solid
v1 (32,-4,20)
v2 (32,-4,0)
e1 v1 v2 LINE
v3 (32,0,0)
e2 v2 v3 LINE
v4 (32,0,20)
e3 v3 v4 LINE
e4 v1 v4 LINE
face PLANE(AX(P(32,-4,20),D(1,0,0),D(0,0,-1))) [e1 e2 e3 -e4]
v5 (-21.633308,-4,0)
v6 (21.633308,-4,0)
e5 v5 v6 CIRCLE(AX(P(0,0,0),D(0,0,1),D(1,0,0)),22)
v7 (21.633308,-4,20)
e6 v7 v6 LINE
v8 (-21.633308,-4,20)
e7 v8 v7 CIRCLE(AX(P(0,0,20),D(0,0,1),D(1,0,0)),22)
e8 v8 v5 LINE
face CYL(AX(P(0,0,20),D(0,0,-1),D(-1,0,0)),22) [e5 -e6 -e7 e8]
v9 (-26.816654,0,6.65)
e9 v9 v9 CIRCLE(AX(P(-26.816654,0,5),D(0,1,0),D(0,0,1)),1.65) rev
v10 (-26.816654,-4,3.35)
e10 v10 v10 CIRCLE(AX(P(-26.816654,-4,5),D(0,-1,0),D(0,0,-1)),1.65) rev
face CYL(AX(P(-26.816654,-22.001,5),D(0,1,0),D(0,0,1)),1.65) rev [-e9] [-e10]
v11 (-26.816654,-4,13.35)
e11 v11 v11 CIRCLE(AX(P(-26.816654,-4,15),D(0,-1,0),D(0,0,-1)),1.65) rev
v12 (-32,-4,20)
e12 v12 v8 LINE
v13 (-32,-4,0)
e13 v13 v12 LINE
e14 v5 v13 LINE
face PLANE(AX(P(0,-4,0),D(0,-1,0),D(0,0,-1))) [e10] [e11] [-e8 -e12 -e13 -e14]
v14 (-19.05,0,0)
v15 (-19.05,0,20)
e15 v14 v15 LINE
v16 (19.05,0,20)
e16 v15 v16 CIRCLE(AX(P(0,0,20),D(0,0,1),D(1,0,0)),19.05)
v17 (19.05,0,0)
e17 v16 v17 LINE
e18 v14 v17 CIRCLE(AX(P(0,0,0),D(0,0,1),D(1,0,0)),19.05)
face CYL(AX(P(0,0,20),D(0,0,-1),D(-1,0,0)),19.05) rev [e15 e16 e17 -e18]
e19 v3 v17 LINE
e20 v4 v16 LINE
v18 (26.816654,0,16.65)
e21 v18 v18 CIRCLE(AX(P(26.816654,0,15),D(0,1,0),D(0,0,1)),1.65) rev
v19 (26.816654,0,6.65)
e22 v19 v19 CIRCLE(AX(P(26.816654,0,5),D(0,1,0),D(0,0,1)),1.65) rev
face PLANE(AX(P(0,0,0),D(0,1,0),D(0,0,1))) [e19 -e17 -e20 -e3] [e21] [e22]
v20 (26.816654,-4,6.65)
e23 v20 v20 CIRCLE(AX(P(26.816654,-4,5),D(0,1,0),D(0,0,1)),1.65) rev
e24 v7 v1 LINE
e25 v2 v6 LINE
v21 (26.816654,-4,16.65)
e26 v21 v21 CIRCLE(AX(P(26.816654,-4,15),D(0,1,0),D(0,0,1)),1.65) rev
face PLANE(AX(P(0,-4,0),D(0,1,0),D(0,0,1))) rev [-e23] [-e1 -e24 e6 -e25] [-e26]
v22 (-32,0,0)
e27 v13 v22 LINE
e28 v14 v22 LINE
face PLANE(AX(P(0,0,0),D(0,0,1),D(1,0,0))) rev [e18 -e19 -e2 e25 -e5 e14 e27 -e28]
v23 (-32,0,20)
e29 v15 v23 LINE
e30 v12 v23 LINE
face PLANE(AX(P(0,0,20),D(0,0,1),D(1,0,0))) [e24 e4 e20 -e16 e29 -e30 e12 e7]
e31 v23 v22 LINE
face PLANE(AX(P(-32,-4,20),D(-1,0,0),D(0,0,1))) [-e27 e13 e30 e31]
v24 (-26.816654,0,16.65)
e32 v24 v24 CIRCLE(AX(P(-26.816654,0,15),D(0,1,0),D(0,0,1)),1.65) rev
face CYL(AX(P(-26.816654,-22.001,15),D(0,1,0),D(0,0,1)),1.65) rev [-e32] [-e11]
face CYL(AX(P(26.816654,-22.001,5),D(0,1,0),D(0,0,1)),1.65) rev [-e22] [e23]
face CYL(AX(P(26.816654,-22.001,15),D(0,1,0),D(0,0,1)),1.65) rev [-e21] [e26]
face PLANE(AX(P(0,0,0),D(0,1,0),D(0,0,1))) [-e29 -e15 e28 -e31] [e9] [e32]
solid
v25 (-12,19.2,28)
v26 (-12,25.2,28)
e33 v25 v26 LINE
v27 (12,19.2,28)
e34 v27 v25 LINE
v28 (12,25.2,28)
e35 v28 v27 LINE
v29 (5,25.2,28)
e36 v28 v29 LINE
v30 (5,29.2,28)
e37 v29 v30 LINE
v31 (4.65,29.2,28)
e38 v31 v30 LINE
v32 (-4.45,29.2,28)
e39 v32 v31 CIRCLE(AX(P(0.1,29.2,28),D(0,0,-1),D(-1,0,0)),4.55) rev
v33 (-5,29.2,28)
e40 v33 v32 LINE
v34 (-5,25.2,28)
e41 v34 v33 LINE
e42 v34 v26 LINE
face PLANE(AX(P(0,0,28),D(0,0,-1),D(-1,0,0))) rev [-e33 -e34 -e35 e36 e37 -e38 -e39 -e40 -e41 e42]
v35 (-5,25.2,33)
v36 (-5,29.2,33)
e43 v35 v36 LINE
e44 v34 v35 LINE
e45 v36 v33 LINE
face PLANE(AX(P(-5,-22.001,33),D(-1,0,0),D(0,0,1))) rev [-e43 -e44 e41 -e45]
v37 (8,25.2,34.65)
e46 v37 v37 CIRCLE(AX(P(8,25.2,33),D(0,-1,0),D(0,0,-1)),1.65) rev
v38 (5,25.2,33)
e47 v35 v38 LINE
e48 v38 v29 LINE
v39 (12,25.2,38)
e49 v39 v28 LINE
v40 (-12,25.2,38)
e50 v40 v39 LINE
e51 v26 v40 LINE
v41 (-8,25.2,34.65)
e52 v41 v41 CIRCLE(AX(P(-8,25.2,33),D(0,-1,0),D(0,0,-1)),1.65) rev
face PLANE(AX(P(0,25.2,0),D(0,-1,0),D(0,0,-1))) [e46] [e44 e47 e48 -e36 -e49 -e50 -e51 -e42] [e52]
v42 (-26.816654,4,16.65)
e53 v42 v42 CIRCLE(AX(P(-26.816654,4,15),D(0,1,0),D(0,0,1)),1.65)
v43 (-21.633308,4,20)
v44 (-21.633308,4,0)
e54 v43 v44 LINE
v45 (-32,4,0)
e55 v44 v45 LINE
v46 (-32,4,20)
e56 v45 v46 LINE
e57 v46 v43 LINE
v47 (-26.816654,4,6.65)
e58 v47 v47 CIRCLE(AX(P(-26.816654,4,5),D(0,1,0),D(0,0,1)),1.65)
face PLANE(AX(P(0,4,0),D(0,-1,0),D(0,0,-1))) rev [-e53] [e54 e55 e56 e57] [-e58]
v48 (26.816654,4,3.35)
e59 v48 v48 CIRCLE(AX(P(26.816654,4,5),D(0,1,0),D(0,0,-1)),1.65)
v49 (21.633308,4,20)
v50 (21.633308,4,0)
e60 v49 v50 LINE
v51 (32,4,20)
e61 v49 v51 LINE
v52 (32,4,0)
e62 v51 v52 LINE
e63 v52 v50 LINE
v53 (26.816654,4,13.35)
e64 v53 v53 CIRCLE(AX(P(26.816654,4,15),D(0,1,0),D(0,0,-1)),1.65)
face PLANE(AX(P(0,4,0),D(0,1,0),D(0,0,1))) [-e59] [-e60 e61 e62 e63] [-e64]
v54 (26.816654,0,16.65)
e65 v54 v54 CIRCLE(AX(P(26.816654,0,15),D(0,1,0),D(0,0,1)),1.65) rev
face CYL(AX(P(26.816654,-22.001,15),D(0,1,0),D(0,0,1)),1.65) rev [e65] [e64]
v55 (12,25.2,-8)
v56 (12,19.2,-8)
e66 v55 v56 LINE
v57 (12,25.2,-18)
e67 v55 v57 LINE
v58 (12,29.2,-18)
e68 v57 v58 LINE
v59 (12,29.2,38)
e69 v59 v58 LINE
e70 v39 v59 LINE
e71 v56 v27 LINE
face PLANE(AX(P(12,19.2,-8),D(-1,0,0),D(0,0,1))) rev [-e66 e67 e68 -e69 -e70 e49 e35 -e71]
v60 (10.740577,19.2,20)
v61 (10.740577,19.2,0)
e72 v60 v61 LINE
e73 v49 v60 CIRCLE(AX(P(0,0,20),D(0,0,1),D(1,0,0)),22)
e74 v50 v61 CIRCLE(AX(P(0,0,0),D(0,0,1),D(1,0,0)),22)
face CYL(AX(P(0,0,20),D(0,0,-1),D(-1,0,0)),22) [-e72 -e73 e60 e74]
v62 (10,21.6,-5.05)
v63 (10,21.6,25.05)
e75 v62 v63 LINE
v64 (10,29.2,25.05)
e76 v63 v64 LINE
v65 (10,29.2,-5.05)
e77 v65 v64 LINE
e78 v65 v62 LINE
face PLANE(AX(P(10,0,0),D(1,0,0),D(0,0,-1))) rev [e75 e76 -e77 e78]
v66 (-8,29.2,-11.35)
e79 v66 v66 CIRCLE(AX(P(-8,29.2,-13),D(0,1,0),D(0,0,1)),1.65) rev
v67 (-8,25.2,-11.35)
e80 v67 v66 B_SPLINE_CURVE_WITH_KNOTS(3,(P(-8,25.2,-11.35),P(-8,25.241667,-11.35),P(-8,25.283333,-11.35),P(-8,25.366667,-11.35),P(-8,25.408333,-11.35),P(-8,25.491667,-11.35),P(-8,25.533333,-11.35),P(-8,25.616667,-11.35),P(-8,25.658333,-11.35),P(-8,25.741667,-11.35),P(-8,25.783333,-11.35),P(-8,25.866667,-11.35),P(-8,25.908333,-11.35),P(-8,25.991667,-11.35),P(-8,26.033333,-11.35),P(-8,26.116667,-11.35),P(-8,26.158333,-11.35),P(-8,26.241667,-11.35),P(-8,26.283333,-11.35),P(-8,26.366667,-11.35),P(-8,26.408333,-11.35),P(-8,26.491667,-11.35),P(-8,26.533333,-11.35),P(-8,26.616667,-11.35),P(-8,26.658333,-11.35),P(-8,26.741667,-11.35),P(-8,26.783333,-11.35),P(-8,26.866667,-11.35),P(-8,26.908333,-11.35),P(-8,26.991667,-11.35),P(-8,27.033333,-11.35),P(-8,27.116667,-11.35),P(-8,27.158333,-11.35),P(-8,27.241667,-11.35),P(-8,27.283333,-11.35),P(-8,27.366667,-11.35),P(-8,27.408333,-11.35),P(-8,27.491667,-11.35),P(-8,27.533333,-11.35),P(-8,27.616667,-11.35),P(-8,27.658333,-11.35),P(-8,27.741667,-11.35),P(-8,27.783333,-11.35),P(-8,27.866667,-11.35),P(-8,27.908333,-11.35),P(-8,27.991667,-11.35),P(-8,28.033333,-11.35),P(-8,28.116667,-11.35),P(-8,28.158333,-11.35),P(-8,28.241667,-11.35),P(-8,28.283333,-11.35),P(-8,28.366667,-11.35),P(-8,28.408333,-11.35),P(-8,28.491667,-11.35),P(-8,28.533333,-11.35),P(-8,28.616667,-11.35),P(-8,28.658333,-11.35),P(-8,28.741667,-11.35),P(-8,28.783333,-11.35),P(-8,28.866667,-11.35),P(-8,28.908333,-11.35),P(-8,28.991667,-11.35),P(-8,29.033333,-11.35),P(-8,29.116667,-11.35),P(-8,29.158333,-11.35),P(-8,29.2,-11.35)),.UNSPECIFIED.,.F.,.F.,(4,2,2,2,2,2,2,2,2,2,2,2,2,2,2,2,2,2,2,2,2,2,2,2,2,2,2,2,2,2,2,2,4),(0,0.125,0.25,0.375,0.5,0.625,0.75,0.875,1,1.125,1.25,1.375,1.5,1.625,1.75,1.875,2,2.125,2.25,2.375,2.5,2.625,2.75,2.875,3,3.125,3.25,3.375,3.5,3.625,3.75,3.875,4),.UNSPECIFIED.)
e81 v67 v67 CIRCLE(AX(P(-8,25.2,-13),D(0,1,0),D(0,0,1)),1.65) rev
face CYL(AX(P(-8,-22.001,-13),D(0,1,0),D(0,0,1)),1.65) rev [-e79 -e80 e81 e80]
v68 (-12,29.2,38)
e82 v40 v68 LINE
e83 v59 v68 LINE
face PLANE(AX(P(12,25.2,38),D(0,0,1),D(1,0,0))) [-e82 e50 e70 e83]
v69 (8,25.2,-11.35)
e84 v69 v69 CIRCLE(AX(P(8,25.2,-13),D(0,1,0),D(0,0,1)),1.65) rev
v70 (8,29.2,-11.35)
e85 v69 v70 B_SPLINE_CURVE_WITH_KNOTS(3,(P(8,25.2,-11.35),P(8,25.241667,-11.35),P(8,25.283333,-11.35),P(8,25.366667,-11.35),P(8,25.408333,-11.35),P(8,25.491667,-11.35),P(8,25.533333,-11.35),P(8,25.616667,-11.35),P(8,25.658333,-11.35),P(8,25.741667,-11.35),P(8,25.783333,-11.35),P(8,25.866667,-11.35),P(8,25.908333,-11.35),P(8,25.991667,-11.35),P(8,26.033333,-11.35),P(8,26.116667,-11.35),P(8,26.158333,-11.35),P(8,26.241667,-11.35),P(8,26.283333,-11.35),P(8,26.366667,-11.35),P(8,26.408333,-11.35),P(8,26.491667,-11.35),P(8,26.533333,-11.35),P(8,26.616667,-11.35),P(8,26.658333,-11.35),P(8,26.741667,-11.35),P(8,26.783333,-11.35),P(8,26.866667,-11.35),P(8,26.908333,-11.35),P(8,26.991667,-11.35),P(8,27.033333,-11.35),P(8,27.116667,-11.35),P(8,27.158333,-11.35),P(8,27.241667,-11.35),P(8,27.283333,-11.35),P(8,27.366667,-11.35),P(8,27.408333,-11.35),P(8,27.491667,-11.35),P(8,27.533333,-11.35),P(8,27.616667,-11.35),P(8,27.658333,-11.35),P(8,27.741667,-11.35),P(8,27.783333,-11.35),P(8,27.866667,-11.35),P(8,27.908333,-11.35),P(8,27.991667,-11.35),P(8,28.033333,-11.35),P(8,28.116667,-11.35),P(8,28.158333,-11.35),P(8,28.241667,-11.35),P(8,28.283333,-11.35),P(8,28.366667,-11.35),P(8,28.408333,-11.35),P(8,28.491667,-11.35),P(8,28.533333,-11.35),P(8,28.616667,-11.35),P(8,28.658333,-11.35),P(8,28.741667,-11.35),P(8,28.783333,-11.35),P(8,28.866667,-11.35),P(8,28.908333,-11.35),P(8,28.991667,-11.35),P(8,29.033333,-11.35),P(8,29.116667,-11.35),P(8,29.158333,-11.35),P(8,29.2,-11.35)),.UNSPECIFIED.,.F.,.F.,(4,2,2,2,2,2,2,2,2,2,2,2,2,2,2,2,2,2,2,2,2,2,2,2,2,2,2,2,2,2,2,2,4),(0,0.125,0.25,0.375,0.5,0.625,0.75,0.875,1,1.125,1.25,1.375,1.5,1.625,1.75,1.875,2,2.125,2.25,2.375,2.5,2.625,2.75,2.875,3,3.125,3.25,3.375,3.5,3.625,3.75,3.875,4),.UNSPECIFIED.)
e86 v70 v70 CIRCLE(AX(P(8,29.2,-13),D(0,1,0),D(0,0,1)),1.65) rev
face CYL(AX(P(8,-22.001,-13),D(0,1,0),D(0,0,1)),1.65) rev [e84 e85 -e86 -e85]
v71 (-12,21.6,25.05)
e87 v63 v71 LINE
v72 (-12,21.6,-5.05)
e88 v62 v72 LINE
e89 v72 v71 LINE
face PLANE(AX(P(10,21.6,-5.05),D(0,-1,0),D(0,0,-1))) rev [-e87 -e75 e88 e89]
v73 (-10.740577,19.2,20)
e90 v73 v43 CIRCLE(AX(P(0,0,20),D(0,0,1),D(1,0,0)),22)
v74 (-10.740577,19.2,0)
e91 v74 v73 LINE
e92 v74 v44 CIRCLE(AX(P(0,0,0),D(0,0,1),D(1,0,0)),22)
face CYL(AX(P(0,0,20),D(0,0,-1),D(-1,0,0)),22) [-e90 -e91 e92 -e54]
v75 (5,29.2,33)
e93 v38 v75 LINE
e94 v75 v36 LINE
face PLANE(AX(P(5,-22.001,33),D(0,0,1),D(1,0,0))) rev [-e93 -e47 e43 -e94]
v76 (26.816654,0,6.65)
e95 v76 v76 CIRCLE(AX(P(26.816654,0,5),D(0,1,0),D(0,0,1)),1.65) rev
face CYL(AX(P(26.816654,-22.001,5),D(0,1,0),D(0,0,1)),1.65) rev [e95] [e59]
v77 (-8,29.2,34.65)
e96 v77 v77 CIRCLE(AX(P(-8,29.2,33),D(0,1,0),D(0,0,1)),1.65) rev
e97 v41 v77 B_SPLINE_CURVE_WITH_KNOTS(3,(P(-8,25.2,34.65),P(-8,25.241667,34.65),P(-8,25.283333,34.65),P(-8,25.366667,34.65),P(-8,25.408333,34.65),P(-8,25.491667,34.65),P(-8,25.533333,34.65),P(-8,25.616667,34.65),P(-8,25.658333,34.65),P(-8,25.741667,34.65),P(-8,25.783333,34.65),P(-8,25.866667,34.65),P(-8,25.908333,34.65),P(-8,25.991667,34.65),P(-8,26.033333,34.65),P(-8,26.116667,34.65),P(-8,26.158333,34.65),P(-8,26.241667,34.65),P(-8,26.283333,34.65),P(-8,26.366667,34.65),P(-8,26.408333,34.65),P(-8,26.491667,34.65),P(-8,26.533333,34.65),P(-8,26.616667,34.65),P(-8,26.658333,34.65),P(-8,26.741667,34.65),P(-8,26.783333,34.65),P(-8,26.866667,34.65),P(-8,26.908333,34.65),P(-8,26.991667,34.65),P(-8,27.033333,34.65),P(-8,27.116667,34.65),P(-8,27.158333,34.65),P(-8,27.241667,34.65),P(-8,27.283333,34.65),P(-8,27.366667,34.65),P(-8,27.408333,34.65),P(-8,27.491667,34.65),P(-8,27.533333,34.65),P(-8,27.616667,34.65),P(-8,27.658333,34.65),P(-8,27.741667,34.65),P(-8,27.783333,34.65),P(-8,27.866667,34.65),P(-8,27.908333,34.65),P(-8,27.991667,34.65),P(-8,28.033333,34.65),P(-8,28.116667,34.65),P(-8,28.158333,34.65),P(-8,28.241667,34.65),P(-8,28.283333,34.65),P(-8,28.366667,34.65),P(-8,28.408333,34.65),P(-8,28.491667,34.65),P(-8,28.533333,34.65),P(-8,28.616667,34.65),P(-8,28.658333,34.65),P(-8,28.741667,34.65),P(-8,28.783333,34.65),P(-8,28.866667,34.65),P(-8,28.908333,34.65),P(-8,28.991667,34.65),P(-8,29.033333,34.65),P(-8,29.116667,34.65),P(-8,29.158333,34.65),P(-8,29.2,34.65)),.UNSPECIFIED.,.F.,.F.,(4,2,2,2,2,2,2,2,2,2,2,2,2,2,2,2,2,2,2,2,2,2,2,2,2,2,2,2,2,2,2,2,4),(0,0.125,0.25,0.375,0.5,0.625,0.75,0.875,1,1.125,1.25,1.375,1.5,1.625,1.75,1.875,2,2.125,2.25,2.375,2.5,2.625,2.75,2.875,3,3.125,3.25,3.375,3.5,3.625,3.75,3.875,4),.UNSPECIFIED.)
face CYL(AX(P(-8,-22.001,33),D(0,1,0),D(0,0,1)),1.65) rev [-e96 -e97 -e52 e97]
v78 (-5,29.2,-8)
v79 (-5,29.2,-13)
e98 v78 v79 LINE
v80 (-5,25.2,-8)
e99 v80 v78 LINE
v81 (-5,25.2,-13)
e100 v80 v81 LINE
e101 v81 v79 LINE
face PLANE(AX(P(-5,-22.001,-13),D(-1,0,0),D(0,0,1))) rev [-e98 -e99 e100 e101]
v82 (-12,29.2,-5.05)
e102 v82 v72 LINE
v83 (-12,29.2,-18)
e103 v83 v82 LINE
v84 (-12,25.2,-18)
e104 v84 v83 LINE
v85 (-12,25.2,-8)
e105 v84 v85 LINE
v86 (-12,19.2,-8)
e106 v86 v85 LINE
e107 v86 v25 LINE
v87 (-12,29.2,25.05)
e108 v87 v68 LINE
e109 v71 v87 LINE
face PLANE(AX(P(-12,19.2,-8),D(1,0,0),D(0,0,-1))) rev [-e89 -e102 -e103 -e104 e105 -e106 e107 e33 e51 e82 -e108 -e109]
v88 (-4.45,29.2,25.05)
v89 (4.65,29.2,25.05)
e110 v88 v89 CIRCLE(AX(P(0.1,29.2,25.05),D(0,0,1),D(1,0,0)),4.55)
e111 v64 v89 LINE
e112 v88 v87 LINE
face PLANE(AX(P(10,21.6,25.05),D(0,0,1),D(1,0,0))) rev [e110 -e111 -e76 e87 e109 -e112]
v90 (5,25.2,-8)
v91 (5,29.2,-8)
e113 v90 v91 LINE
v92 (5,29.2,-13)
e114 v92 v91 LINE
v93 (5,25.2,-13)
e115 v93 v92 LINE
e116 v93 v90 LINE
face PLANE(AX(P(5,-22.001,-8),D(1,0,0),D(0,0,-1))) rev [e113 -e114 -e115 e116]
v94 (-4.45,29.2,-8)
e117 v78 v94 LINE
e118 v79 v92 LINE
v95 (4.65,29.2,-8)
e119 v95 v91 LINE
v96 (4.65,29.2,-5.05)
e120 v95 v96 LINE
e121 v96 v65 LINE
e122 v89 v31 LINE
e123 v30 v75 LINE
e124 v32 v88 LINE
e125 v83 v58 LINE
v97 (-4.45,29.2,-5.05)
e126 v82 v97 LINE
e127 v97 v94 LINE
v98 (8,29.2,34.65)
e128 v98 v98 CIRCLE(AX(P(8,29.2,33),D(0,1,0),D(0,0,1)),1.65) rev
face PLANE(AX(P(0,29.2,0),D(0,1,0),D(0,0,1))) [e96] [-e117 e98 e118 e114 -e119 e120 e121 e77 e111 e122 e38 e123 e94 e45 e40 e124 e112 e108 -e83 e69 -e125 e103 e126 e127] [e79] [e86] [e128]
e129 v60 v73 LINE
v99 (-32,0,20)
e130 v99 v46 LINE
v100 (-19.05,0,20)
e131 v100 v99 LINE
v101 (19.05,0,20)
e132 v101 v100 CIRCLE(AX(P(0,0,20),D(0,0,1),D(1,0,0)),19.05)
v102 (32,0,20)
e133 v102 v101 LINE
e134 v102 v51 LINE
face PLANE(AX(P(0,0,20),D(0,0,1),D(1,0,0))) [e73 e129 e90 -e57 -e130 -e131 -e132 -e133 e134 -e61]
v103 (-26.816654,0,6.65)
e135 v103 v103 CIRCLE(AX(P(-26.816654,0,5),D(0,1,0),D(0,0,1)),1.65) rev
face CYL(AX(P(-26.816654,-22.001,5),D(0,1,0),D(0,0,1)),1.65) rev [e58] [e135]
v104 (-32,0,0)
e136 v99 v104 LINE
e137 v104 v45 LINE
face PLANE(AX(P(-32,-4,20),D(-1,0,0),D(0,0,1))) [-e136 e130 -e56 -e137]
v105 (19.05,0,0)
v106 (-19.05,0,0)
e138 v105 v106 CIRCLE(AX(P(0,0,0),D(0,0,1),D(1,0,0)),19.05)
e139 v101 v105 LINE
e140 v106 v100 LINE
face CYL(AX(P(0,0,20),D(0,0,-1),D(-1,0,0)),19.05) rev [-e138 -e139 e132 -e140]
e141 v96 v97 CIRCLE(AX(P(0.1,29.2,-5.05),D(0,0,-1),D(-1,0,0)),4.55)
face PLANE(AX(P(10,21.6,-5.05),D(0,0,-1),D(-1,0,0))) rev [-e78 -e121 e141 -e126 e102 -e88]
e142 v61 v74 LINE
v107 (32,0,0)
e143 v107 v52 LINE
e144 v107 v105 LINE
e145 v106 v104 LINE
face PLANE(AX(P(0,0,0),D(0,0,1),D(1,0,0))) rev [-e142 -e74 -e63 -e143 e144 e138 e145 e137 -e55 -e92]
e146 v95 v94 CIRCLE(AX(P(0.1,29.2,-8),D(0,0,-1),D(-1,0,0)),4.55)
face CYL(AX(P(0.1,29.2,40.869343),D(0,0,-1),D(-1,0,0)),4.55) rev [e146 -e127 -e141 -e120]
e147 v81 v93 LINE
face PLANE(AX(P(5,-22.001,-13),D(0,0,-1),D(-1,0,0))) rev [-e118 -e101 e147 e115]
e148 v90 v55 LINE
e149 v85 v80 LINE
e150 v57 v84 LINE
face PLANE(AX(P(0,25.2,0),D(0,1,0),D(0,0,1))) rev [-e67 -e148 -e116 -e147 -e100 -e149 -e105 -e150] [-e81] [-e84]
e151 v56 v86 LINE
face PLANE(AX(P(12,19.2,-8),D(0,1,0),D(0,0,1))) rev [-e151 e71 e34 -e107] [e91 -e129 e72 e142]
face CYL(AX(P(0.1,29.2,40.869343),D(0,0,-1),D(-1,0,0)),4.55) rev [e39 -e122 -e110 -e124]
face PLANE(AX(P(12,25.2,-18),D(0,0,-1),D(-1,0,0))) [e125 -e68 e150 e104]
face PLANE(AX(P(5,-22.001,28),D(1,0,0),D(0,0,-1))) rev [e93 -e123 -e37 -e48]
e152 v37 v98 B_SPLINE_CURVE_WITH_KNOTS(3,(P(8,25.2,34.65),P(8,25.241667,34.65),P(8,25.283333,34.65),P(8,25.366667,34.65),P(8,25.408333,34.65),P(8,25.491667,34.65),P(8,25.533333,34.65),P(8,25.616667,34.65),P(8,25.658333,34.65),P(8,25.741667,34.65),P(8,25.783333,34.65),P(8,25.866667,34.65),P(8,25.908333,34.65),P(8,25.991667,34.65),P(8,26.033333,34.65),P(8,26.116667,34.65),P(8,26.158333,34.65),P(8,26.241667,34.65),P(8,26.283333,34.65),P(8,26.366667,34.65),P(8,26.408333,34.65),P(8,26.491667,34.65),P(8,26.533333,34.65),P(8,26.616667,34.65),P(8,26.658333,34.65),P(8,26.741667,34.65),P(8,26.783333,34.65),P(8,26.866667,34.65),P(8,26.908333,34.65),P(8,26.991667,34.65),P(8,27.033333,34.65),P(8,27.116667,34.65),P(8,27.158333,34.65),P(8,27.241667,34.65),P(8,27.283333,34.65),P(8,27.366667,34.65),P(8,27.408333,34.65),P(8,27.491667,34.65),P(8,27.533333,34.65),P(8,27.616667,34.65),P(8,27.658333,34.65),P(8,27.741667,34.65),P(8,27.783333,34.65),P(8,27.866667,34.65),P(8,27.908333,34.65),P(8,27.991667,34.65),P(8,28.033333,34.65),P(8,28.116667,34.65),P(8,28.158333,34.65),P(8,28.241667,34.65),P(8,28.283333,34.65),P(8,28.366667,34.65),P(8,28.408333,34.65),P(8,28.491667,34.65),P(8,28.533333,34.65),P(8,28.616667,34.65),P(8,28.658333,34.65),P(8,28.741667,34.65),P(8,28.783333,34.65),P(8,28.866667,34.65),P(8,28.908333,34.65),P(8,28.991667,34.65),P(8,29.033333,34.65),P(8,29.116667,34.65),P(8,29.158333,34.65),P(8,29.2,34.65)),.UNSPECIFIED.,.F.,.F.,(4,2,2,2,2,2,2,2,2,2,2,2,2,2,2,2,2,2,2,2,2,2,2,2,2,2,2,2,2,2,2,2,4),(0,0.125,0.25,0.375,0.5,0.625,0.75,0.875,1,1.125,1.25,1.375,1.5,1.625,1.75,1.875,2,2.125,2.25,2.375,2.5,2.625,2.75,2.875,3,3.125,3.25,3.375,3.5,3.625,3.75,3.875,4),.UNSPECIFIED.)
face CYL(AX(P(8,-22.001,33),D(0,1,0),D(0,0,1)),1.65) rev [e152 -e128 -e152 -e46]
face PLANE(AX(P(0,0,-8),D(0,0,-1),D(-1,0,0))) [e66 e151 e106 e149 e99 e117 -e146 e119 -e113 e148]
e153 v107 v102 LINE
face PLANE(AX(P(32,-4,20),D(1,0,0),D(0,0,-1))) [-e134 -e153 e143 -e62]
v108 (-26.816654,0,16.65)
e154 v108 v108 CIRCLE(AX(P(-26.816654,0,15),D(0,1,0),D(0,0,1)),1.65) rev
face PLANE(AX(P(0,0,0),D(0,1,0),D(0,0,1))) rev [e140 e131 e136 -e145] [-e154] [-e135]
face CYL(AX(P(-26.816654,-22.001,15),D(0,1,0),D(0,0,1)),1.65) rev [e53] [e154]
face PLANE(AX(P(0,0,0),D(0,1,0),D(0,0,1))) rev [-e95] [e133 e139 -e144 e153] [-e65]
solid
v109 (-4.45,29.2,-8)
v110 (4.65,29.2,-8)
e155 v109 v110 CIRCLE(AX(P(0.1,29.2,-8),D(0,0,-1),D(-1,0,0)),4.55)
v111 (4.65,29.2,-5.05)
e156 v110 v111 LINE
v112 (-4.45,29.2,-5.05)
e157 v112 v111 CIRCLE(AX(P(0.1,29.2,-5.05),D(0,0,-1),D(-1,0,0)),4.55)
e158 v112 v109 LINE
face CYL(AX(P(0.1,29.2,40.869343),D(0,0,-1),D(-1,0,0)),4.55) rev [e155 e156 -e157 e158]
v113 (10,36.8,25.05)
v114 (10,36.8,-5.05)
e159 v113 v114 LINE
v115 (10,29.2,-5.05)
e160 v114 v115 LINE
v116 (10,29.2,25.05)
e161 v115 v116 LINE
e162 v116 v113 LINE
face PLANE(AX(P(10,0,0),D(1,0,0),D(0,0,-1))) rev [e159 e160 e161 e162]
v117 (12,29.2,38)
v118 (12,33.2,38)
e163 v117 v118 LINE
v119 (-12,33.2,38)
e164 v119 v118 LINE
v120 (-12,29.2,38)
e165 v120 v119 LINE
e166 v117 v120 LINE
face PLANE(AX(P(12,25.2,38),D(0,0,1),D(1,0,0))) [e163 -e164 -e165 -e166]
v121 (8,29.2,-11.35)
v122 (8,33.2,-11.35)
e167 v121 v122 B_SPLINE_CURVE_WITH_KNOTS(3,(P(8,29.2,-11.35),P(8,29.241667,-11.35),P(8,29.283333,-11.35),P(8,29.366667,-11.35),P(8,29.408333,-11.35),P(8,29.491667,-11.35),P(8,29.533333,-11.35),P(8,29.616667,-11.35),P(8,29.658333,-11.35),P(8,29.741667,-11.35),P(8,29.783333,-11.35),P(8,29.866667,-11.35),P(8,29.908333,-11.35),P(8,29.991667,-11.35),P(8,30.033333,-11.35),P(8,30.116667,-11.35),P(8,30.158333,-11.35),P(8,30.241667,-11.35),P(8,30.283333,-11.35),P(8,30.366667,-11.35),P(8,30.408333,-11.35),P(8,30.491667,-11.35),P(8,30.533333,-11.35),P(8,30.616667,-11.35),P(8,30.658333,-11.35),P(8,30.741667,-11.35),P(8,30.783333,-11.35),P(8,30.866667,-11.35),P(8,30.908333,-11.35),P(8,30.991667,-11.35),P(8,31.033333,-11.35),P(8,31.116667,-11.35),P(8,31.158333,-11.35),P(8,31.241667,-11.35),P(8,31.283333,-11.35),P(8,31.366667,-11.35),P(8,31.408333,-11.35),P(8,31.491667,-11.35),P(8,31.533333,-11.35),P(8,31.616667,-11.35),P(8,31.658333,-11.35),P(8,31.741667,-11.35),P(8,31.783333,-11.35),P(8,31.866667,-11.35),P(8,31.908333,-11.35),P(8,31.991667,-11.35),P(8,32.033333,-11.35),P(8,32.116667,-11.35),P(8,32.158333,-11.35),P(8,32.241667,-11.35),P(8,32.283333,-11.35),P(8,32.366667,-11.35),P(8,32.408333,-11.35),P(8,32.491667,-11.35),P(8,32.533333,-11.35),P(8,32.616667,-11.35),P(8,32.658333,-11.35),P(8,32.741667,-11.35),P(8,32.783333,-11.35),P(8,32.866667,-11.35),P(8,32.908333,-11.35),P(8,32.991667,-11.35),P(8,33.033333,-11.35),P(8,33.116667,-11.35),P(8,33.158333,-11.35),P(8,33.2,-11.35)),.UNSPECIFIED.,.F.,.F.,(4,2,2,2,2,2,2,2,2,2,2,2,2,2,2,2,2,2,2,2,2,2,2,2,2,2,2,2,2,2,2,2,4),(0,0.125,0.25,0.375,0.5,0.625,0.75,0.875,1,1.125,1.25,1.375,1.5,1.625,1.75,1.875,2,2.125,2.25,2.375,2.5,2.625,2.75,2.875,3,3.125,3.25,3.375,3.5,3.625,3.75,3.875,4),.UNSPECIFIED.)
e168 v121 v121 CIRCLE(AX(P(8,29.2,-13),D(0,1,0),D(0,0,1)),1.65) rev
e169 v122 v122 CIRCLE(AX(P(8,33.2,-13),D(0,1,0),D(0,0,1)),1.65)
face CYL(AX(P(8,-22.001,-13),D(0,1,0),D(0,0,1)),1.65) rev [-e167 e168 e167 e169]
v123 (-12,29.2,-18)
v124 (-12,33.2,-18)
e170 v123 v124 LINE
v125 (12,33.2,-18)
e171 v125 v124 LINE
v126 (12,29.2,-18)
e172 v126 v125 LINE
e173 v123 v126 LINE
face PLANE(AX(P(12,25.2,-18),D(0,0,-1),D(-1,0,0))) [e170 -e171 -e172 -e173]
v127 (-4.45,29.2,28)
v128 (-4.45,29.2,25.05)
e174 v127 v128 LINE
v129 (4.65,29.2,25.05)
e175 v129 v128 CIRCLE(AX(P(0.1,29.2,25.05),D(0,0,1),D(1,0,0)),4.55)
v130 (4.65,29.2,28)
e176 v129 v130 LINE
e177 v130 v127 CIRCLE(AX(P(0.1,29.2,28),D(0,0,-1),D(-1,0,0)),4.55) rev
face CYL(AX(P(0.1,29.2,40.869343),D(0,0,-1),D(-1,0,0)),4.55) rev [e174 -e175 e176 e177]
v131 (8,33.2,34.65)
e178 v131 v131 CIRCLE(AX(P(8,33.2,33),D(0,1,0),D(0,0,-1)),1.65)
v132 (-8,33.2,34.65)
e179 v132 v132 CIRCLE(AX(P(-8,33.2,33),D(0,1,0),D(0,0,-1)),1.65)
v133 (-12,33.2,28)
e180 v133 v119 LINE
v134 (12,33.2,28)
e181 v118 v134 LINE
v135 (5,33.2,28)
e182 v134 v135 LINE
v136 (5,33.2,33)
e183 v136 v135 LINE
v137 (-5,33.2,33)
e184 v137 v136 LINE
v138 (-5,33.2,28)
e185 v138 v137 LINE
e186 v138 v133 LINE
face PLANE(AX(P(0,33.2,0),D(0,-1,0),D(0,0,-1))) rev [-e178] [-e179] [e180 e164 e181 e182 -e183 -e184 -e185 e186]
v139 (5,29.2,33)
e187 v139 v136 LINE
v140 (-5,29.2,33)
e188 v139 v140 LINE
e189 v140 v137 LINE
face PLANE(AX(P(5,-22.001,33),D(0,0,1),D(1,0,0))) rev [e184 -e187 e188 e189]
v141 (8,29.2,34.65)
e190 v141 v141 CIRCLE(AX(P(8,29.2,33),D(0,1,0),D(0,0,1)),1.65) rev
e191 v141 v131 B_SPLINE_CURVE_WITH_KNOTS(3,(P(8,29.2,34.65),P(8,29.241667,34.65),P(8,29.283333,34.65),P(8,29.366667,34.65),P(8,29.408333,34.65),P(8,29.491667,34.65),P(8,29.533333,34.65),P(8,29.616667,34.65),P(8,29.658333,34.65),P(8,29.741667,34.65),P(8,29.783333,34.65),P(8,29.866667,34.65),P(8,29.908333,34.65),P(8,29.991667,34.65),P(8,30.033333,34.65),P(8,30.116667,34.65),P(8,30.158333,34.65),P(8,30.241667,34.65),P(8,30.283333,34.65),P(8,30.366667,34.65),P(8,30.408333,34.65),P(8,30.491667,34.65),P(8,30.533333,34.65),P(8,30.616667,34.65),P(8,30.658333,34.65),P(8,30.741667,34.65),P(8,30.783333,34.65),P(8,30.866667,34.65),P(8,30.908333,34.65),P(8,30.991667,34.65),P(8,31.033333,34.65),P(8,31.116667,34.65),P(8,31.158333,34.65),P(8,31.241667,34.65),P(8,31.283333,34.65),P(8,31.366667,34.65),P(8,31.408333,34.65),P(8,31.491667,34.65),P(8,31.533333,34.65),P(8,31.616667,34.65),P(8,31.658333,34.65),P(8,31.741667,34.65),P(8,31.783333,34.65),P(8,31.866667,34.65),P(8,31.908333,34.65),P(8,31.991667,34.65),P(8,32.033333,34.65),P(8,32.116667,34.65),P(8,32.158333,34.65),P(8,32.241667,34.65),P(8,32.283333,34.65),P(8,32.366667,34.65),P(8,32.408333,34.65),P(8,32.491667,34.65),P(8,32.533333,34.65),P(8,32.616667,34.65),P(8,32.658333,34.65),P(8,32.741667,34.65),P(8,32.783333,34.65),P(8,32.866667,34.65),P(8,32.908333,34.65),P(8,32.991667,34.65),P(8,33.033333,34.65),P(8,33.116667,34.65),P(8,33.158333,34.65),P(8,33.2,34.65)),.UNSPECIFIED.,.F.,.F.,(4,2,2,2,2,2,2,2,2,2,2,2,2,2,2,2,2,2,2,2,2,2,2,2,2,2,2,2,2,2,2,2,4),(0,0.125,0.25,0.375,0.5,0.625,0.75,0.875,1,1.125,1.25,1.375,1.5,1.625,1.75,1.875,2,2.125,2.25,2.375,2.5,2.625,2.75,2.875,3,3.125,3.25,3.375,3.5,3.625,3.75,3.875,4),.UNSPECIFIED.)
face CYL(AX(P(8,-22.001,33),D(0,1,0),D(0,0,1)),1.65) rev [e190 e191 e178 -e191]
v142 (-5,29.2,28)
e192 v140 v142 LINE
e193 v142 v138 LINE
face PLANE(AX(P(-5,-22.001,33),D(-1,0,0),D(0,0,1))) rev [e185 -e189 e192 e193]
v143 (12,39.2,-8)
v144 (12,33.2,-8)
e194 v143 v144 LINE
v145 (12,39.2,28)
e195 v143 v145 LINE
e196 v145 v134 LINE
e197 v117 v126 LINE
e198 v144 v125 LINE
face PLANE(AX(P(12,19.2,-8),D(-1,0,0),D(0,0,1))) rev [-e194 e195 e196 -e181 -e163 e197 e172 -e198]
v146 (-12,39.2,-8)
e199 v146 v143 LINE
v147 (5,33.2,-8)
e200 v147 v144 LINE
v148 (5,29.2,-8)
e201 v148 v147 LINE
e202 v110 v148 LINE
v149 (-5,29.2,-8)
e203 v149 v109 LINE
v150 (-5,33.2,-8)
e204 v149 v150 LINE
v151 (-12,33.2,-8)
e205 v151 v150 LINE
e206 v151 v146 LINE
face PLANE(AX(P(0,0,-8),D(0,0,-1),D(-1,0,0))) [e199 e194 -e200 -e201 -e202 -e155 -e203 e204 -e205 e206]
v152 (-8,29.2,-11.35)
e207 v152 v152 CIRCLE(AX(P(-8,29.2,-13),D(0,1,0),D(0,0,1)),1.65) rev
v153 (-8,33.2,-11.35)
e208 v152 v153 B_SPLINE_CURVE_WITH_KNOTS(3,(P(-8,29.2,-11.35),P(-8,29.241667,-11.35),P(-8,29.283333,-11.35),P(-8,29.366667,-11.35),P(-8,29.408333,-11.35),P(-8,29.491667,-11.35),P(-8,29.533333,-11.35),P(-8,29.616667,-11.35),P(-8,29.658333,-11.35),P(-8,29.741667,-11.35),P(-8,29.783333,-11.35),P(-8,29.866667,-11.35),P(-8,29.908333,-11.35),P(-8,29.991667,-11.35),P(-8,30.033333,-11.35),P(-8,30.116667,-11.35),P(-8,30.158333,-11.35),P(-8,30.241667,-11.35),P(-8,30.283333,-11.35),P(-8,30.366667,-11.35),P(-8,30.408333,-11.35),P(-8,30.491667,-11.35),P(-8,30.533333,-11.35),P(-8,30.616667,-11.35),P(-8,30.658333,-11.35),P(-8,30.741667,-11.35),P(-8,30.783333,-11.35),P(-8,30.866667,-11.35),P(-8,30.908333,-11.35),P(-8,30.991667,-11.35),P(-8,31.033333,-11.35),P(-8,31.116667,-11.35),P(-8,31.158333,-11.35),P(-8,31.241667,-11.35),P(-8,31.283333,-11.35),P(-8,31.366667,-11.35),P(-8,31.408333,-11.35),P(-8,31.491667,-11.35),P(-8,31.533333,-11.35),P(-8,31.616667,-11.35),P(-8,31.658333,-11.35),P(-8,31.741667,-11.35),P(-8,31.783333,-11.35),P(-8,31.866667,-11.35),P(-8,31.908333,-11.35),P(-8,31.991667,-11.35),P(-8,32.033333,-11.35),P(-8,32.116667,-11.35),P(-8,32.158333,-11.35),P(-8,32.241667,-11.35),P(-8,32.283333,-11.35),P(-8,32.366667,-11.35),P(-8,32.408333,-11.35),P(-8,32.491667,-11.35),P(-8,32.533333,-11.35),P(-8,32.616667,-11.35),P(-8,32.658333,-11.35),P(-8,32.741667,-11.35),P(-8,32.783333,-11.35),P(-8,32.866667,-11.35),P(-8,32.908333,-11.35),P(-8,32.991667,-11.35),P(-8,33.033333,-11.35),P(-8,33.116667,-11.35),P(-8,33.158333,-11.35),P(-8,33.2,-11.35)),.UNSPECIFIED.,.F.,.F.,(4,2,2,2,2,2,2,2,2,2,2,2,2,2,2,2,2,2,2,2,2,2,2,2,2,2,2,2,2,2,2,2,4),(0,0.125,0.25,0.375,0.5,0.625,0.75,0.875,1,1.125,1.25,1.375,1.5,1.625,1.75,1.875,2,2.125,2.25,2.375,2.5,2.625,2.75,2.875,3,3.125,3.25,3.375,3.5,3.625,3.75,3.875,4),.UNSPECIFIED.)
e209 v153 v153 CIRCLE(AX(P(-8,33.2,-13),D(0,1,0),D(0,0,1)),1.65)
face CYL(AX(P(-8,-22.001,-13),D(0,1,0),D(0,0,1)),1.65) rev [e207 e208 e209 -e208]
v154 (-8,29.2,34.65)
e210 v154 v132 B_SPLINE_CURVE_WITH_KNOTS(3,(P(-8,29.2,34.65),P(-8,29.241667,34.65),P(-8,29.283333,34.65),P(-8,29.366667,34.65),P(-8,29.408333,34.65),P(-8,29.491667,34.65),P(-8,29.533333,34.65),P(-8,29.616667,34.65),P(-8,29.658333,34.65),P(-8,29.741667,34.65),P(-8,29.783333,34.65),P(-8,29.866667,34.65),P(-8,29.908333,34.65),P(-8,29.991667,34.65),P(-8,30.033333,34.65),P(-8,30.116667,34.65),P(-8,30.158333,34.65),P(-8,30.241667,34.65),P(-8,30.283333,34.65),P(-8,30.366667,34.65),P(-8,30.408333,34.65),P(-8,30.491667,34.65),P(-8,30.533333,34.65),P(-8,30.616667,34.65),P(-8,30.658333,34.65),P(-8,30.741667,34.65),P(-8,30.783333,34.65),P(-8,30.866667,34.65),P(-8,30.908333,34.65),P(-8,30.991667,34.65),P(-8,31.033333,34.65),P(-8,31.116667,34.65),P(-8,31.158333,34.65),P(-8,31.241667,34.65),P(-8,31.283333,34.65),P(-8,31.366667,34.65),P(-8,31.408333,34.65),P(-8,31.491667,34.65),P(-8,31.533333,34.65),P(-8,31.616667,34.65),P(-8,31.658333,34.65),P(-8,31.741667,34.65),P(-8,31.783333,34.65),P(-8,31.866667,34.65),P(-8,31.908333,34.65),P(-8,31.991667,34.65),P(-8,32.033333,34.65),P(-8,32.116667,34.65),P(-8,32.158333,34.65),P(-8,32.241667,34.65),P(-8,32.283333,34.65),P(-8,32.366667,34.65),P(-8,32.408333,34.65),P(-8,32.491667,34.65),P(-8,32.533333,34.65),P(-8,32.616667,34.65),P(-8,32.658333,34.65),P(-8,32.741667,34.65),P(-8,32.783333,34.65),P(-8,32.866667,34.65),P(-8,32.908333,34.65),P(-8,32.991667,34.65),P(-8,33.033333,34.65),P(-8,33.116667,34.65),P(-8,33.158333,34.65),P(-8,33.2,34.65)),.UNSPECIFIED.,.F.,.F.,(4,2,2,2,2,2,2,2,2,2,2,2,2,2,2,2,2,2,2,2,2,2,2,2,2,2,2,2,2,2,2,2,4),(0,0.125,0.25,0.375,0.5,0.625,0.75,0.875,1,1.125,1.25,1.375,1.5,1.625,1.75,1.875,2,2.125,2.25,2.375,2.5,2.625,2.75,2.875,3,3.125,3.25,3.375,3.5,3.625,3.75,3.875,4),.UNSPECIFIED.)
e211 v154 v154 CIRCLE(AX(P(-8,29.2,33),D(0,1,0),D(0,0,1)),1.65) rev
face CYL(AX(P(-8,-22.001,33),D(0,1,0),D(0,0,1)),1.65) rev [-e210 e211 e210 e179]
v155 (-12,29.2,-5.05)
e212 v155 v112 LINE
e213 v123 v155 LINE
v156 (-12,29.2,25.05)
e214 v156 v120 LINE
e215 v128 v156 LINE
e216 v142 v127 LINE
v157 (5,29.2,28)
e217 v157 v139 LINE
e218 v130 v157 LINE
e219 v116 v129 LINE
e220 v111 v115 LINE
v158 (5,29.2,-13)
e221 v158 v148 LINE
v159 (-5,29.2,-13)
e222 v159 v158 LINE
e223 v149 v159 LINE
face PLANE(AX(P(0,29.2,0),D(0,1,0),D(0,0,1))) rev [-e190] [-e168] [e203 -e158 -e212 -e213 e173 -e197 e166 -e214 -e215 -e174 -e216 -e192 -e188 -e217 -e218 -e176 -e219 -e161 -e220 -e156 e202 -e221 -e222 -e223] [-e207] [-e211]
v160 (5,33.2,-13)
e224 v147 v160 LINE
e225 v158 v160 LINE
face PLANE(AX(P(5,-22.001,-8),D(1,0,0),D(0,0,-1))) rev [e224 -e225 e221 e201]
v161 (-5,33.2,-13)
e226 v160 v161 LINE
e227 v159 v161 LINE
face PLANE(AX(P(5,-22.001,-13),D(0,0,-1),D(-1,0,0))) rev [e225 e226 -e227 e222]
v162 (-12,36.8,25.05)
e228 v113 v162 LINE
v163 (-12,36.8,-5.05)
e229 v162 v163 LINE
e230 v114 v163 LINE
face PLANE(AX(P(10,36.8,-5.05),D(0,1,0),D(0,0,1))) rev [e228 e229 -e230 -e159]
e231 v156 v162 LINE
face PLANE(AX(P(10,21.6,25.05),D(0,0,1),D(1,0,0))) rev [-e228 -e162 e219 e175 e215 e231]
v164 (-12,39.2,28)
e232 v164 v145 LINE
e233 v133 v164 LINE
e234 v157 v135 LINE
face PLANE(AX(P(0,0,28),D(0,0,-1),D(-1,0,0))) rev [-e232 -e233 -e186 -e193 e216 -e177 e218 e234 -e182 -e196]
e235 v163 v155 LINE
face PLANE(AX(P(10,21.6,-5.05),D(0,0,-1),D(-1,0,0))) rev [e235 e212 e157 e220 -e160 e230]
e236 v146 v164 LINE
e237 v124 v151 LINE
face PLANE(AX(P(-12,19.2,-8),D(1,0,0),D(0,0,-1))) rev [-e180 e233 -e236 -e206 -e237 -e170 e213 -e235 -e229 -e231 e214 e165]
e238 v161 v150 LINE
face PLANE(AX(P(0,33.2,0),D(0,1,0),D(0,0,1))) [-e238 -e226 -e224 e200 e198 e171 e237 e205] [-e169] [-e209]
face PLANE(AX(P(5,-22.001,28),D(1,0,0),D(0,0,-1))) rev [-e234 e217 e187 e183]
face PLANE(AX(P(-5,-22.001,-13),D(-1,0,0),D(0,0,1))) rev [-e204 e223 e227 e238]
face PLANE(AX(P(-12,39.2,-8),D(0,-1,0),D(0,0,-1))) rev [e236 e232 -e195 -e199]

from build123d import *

# Parameters (mm, degrees)
SKETCH_1_R           = 22
SKETCH_1_R_2         = 19.05
EXTRUDE_1_DEPTH      = 20
EXTRUDE_2_DEPTH      = 4
EXTRUDE_2_DEPTH_BACK = 4
SKETCH_2_W           = 12
SKETCH_2_H           = 20
CUT_EXTRUDE_1_REACH  = 47.826
SKETCH_3_R           = 1.65
EXTRUDE_3_DEPTH      = 8
EXTRUDE_3_DEPTH_BACK = 28
SKETCH_4_W           = 24
SKETCH_4_H           = 20
SKETCH_5_W           = 30.1
SKETCH_5_H           = 15.2
CUT_EXTRUDE_2_DEPTH  = 22
CUT_EXTRUDE_3_REACH  = 64.102
SKETCH_6_R           = 4.55
EXTRUDE_4_DEPTH      = 4
EXTRUDE_4_DEPTH_BACK = 4
SKETCH_7_W           = 24
SKETCH_7_H           = 10
CUT_EXTRUDE_4_REACH  = 76.263
SKETCH_8_R           = 1.65
SKETCH_8_W           = 10
SKETCH_8_H           = 5


# Read off the part's stored shape, not the designer's step: 部品分割2
with BuildPart() as part:
    # ｽｹｯﾁ1 → ﾎﾞｽ - 押し出し1 (new body)
    with BuildSketch(Plane.XY):
        Circle(SKETCH_1_R)
        Circle(SKETCH_1_R_2, mode=Mode.SUBTRACT)
    extrude(amount=EXTRUDE_1_DEPTH)

    # ｽｹｯﾁ2 → ﾎﾞｽ - 押し出し2 (add, two sides: drawn at the far end of the back side and taken through both)
    with BuildSketch(Plane(origin=(0, 0, 0), x_dir=(1, 0, 0), z_dir=(0, 1, 0)).offset(-EXTRUDE_2_DEPTH_BACK)):
        with Locations((-26, -10)):
            Rectangle(SKETCH_2_W, SKETCH_2_H)
        with Locations((26, -10)):
            Rectangle(SKETCH_2_W, SKETCH_2_H)
    extrude(amount=EXTRUDE_2_DEPTH + EXTRUDE_2_DEPTH_BACK)

    # ｽｹｯﾁ3 → ｶｯﾄ - 押し出し1 (cut, up to next)
    with BuildSketch(Plane(origin=(0, 4, 0), x_dir=(1, 0, 0), z_dir=(0, 1, 0)), mode=Mode.PRIVATE) as cut_extrude_1_sk1:
        with Locations(Location((-26.816653826, -5, 0), (0, 0, 270))):
            Circle(SKETCH_3_R)
    cut_extrude_1_tool1 = extrude(cut_extrude_1_sk1.sketch, amount=-CUT_EXTRUDE_1_REACH, mode=Mode.PRIVATE) & part.part
    # ｽｹｯﾁ3 → ｶｯﾄ - 押し出し1 (cut, up to next)
    with BuildSketch(Plane(origin=(0, 4, 0), x_dir=(1, 0, 0), z_dir=(0, 1, 0)), mode=Mode.PRIVATE) as cut_extrude_1_sk2:
        with Locations(Location((-26.816653826, -15, 0), (0, 0, 270))):
            Circle(SKETCH_3_R)
    cut_extrude_1_tool2 = extrude(cut_extrude_1_sk2.sketch, amount=-CUT_EXTRUDE_1_REACH, mode=Mode.PRIVATE) & part.part
    # ｽｹｯﾁ3 → ｶｯﾄ - 押し出し1 (cut, up to next)
    with BuildSketch(Plane(origin=(0, 4, 0), x_dir=(1, 0, 0), z_dir=(0, 1, 0)), mode=Mode.PRIVATE) as cut_extrude_1_sk3:
        with Locations(Location((26.816653826, -15, 0), (0, 0, 270))):
            Circle(SKETCH_3_R)
    cut_extrude_1_tool3 = extrude(cut_extrude_1_sk3.sketch, amount=-CUT_EXTRUDE_1_REACH, mode=Mode.PRIVATE) & part.part
    # ｽｹｯﾁ3 → ｶｯﾄ - 押し出し1 (cut, up to next)
    with BuildSketch(Plane(origin=(0, 4, 0), x_dir=(1, 0, 0), z_dir=(0, 1, 0)), mode=Mode.PRIVATE) as cut_extrude_1_sk4:
        with Locations(Location((26.816653826, -5, 0), (0, 0, 270))):
            Circle(SKETCH_3_R)
    cut_extrude_1_tool4 = extrude(cut_extrude_1_sk4.sketch, amount=-CUT_EXTRUDE_1_REACH, mode=Mode.PRIVATE) & part.part
    add(cut_extrude_1_tool1.solids().sort_by_distance((-26.816654, 4, 5))[0], mode=Mode.SUBTRACT)
    add(cut_extrude_1_tool2.solids().sort_by_distance((-26.816654, 4, 15))[0], mode=Mode.SUBTRACT)
    add(cut_extrude_1_tool3.solids().sort_by_distance((26.816654, 4, 15))[0], mode=Mode.SUBTRACT)
    add(cut_extrude_1_tool4.solids().sort_by_distance((26.816654, 4, 5))[0], mode=Mode.SUBTRACT)

    # ｽｹｯﾁ4 → ﾎﾞｽ - 押し出し3 (add, two sides: drawn at the far end of the back side and taken through both)
    with BuildSketch(Plane(origin=(0, 0, 0), x_dir=(-1, 0, 0), z_dir=(0, 0, -1)).offset(-EXTRUDE_3_DEPTH_BACK)):
        with Locations((0, 29.2)):
            Rectangle(SKETCH_4_W, SKETCH_4_H)
    extrude(amount=EXTRUDE_3_DEPTH + EXTRUDE_3_DEPTH_BACK)

    # ｽｹｯﾁ5 → ｶｯﾄ - 押し出し2 (cut)
    with BuildSketch(Plane.ZY.offset(12)):
        with Locations((10, 29.2)):
            Rectangle(SKETCH_5_W, SKETCH_5_H)
    extrude(amount=-CUT_EXTRUDE_2_DEPTH, mode=Mode.SUBTRACT)

    # ｶｯﾄ - 押し出し3: up to this face of the body (flat: up to its plane)
    cut_extrude_3_end = Plane(part.part.faces().sort_by_distance((0, 29.2, 28))[0])
    # ｽｹｯﾁ6 → ｶｯﾄ - 押し出し3 (cut, up to the picked face)
    with BuildSketch(Plane(origin=(0, 0, -8), x_dir=(-1, 0, 0), z_dir=(0, 0, -1)), mode=Mode.PRIVATE) as cut_extrude_3_sk1:
        with Locations((-0.1, 29.2)):
            Circle(SKETCH_6_R)
    cut_extrude_3_tool1 = split(extrude(cut_extrude_3_sk1.sketch, amount=-CUT_EXTRUDE_3_REACH, mode=Mode.PRIVATE), bisect_by=cut_extrude_3_end, keep=Keep.BOTH, mode=Mode.PRIVATE)
    add(cut_extrude_3_tool1.solids().sort_by(Axis((0.1, 29.2, -8), (0, 0, 1)))[0], mode=Mode.SUBTRACT)

    # ｽｹｯﾁ7 → ﾎﾞｽ - 押し出し4 (add, two sides: drawn at the far end of the back side and taken through both)
    with BuildSketch(Plane(origin=(0, 29.2, 0), x_dir=(1, 0, 0), z_dir=(0, 1, 0)).offset(-EXTRUDE_4_DEPTH_BACK)):
        with Locations((0, 13)):
            Rectangle(SKETCH_7_W, SKETCH_7_H)
        with Locations((0, -33)):
            Rectangle(SKETCH_7_W, SKETCH_7_H)
    extrude(amount=EXTRUDE_4_DEPTH + EXTRUDE_4_DEPTH_BACK)

    # ｽｹｯﾁ8 → ｶｯﾄ - 押し出し4 (cut, up to next)
    with BuildSketch(Plane(origin=(0, 33.2, 0), x_dir=(1, 0, 0), z_dir=(0, 1, 0)), mode=Mode.PRIVATE) as cut_extrude_4_sk1:
        with Locations(Location((-8, 13, 0), (0, 0, 270))):
            Circle(SKETCH_8_R)
    cut_extrude_4_tool1 = extrude(cut_extrude_4_sk1.sketch, amount=-CUT_EXTRUDE_4_REACH, mode=Mode.PRIVATE) & part.part
    # ｽｹｯﾁ8 → ｶｯﾄ - 押し出し4 (cut, up to next)
    with BuildSketch(Plane(origin=(0, 33.2, 0), x_dir=(1, 0, 0), z_dir=(0, 1, 0)), mode=Mode.PRIVATE) as cut_extrude_4_sk2:
        with Locations(Location((8, 13, 0), (0, 0, 270))):
            Circle(SKETCH_8_R)
    cut_extrude_4_tool2 = extrude(cut_extrude_4_sk2.sketch, amount=-CUT_EXTRUDE_4_REACH, mode=Mode.PRIVATE) & part.part
    # ｽｹｯﾁ8 → ｶｯﾄ - 押し出し4 (cut, up to next)
    with BuildSketch(Plane(origin=(0, 33.2, 0), x_dir=(1, 0, 0), z_dir=(0, 1, 0)), mode=Mode.PRIVATE) as cut_extrude_4_sk3:
        with Locations(Location((8, -33, 0), (0, 0, 270))):
            Circle(SKETCH_8_R)
    cut_extrude_4_tool3 = extrude(cut_extrude_4_sk3.sketch, amount=-CUT_EXTRUDE_4_REACH, mode=Mode.PRIVATE) & part.part
    # ｽｹｯﾁ8 → ｶｯﾄ - 押し出し4 (cut, up to next)
    with BuildSketch(Plane(origin=(0, 33.2, 0), x_dir=(1, 0, 0), z_dir=(0, 1, 0)), mode=Mode.PRIVATE) as cut_extrude_4_sk4:
        with Locations(Location((-8, -33, 0), (0, 0, 270))):
            Circle(SKETCH_8_R)
    cut_extrude_4_tool4 = extrude(cut_extrude_4_sk4.sketch, amount=-CUT_EXTRUDE_4_REACH, mode=Mode.PRIVATE) & part.part
    # ｽｹｯﾁ8 → ｶｯﾄ - 押し出し4 (cut, up to next)
    with BuildSketch(Plane(origin=(0, 33.2, 0), x_dir=(1, 0, 0), z_dir=(0, 1, 0)), mode=Mode.PRIVATE) as cut_extrude_4_sk5:
        with Locations((0, 10.5)):
            Rectangle(SKETCH_8_W, SKETCH_8_H)
    cut_extrude_4_tool5 = extrude(cut_extrude_4_sk5.sketch, amount=-CUT_EXTRUDE_4_REACH, mode=Mode.PRIVATE) & part.part
    # ｽｹｯﾁ8 → ｶｯﾄ - 押し出し4 (cut, up to next)
    with BuildSketch(Plane(origin=(0, 33.2, 0), x_dir=(1, 0, 0), z_dir=(0, 1, 0)), mode=Mode.PRIVATE) as cut_extrude_4_sk6:
        with Locations((0, -30.5)):
            Rectangle(SKETCH_8_W, SKETCH_8_H)
    cut_extrude_4_tool6 = extrude(cut_extrude_4_sk6.sketch, amount=-CUT_EXTRUDE_4_REACH, mode=Mode.PRIVATE) & part.part
    add(cut_extrude_4_tool1.solids().sort_by_distance((-8, 33.2, -13))[0], mode=Mode.SUBTRACT)
    add(cut_extrude_4_tool2.solids().sort_by_distance((8, 33.2, -13))[0], mode=Mode.SUBTRACT)
    add(cut_extrude_4_tool3.solids().sort_by_distance((8, 33.2, 33))[0], mode=Mode.SUBTRACT)
    add(cut_extrude_4_tool4.solids().sort_by_distance((-8, 33.2, 33))[0], mode=Mode.SUBTRACT)
    add(cut_extrude_4_tool5.solids().sort_by_distance((0, 33.2, -10.5))[0], mode=Mode.SUBTRACT)
    add(cut_extrude_4_tool6.solids().sort_by_distance((0, 33.2, 30.5))[0], mode=Mode.SUBTRACT)


with BuildPart() as body_2:
    # Split Bodies 1: the piece on the far side of the plane
    add(part.part)
    split(bisect_by=Plane.ZX.offset(29.2), keep=Keep.BOTTOM)


with BuildPart() as part_1:
    add(part.part)

    # Split Bodies 1
    split(bisect_by=Plane.ZX.offset(29.2), keep=Keep.TOP)


with BuildPart() as body_3:
    # Split Bodies 2: the piece on the far side of the plane
    add(body_2.part)
    split(bisect_by=Plane(origin=(0, 0, 0), x_dir=(1, 0, 0), z_dir=(0, 1, 0)), keep=Keep.BOTTOM)


with BuildPart() as body_2_1:
    add(body_2.part)

    # Split Bodies 2
    split(bisect_by=Plane(origin=(0, 0, 0), x_dir=(1, 0, 0), z_dir=(0, 1, 0)), keep=Keep.TOP)


solid = Compound([part_1.part, body_3.part, body_2_1.part])
